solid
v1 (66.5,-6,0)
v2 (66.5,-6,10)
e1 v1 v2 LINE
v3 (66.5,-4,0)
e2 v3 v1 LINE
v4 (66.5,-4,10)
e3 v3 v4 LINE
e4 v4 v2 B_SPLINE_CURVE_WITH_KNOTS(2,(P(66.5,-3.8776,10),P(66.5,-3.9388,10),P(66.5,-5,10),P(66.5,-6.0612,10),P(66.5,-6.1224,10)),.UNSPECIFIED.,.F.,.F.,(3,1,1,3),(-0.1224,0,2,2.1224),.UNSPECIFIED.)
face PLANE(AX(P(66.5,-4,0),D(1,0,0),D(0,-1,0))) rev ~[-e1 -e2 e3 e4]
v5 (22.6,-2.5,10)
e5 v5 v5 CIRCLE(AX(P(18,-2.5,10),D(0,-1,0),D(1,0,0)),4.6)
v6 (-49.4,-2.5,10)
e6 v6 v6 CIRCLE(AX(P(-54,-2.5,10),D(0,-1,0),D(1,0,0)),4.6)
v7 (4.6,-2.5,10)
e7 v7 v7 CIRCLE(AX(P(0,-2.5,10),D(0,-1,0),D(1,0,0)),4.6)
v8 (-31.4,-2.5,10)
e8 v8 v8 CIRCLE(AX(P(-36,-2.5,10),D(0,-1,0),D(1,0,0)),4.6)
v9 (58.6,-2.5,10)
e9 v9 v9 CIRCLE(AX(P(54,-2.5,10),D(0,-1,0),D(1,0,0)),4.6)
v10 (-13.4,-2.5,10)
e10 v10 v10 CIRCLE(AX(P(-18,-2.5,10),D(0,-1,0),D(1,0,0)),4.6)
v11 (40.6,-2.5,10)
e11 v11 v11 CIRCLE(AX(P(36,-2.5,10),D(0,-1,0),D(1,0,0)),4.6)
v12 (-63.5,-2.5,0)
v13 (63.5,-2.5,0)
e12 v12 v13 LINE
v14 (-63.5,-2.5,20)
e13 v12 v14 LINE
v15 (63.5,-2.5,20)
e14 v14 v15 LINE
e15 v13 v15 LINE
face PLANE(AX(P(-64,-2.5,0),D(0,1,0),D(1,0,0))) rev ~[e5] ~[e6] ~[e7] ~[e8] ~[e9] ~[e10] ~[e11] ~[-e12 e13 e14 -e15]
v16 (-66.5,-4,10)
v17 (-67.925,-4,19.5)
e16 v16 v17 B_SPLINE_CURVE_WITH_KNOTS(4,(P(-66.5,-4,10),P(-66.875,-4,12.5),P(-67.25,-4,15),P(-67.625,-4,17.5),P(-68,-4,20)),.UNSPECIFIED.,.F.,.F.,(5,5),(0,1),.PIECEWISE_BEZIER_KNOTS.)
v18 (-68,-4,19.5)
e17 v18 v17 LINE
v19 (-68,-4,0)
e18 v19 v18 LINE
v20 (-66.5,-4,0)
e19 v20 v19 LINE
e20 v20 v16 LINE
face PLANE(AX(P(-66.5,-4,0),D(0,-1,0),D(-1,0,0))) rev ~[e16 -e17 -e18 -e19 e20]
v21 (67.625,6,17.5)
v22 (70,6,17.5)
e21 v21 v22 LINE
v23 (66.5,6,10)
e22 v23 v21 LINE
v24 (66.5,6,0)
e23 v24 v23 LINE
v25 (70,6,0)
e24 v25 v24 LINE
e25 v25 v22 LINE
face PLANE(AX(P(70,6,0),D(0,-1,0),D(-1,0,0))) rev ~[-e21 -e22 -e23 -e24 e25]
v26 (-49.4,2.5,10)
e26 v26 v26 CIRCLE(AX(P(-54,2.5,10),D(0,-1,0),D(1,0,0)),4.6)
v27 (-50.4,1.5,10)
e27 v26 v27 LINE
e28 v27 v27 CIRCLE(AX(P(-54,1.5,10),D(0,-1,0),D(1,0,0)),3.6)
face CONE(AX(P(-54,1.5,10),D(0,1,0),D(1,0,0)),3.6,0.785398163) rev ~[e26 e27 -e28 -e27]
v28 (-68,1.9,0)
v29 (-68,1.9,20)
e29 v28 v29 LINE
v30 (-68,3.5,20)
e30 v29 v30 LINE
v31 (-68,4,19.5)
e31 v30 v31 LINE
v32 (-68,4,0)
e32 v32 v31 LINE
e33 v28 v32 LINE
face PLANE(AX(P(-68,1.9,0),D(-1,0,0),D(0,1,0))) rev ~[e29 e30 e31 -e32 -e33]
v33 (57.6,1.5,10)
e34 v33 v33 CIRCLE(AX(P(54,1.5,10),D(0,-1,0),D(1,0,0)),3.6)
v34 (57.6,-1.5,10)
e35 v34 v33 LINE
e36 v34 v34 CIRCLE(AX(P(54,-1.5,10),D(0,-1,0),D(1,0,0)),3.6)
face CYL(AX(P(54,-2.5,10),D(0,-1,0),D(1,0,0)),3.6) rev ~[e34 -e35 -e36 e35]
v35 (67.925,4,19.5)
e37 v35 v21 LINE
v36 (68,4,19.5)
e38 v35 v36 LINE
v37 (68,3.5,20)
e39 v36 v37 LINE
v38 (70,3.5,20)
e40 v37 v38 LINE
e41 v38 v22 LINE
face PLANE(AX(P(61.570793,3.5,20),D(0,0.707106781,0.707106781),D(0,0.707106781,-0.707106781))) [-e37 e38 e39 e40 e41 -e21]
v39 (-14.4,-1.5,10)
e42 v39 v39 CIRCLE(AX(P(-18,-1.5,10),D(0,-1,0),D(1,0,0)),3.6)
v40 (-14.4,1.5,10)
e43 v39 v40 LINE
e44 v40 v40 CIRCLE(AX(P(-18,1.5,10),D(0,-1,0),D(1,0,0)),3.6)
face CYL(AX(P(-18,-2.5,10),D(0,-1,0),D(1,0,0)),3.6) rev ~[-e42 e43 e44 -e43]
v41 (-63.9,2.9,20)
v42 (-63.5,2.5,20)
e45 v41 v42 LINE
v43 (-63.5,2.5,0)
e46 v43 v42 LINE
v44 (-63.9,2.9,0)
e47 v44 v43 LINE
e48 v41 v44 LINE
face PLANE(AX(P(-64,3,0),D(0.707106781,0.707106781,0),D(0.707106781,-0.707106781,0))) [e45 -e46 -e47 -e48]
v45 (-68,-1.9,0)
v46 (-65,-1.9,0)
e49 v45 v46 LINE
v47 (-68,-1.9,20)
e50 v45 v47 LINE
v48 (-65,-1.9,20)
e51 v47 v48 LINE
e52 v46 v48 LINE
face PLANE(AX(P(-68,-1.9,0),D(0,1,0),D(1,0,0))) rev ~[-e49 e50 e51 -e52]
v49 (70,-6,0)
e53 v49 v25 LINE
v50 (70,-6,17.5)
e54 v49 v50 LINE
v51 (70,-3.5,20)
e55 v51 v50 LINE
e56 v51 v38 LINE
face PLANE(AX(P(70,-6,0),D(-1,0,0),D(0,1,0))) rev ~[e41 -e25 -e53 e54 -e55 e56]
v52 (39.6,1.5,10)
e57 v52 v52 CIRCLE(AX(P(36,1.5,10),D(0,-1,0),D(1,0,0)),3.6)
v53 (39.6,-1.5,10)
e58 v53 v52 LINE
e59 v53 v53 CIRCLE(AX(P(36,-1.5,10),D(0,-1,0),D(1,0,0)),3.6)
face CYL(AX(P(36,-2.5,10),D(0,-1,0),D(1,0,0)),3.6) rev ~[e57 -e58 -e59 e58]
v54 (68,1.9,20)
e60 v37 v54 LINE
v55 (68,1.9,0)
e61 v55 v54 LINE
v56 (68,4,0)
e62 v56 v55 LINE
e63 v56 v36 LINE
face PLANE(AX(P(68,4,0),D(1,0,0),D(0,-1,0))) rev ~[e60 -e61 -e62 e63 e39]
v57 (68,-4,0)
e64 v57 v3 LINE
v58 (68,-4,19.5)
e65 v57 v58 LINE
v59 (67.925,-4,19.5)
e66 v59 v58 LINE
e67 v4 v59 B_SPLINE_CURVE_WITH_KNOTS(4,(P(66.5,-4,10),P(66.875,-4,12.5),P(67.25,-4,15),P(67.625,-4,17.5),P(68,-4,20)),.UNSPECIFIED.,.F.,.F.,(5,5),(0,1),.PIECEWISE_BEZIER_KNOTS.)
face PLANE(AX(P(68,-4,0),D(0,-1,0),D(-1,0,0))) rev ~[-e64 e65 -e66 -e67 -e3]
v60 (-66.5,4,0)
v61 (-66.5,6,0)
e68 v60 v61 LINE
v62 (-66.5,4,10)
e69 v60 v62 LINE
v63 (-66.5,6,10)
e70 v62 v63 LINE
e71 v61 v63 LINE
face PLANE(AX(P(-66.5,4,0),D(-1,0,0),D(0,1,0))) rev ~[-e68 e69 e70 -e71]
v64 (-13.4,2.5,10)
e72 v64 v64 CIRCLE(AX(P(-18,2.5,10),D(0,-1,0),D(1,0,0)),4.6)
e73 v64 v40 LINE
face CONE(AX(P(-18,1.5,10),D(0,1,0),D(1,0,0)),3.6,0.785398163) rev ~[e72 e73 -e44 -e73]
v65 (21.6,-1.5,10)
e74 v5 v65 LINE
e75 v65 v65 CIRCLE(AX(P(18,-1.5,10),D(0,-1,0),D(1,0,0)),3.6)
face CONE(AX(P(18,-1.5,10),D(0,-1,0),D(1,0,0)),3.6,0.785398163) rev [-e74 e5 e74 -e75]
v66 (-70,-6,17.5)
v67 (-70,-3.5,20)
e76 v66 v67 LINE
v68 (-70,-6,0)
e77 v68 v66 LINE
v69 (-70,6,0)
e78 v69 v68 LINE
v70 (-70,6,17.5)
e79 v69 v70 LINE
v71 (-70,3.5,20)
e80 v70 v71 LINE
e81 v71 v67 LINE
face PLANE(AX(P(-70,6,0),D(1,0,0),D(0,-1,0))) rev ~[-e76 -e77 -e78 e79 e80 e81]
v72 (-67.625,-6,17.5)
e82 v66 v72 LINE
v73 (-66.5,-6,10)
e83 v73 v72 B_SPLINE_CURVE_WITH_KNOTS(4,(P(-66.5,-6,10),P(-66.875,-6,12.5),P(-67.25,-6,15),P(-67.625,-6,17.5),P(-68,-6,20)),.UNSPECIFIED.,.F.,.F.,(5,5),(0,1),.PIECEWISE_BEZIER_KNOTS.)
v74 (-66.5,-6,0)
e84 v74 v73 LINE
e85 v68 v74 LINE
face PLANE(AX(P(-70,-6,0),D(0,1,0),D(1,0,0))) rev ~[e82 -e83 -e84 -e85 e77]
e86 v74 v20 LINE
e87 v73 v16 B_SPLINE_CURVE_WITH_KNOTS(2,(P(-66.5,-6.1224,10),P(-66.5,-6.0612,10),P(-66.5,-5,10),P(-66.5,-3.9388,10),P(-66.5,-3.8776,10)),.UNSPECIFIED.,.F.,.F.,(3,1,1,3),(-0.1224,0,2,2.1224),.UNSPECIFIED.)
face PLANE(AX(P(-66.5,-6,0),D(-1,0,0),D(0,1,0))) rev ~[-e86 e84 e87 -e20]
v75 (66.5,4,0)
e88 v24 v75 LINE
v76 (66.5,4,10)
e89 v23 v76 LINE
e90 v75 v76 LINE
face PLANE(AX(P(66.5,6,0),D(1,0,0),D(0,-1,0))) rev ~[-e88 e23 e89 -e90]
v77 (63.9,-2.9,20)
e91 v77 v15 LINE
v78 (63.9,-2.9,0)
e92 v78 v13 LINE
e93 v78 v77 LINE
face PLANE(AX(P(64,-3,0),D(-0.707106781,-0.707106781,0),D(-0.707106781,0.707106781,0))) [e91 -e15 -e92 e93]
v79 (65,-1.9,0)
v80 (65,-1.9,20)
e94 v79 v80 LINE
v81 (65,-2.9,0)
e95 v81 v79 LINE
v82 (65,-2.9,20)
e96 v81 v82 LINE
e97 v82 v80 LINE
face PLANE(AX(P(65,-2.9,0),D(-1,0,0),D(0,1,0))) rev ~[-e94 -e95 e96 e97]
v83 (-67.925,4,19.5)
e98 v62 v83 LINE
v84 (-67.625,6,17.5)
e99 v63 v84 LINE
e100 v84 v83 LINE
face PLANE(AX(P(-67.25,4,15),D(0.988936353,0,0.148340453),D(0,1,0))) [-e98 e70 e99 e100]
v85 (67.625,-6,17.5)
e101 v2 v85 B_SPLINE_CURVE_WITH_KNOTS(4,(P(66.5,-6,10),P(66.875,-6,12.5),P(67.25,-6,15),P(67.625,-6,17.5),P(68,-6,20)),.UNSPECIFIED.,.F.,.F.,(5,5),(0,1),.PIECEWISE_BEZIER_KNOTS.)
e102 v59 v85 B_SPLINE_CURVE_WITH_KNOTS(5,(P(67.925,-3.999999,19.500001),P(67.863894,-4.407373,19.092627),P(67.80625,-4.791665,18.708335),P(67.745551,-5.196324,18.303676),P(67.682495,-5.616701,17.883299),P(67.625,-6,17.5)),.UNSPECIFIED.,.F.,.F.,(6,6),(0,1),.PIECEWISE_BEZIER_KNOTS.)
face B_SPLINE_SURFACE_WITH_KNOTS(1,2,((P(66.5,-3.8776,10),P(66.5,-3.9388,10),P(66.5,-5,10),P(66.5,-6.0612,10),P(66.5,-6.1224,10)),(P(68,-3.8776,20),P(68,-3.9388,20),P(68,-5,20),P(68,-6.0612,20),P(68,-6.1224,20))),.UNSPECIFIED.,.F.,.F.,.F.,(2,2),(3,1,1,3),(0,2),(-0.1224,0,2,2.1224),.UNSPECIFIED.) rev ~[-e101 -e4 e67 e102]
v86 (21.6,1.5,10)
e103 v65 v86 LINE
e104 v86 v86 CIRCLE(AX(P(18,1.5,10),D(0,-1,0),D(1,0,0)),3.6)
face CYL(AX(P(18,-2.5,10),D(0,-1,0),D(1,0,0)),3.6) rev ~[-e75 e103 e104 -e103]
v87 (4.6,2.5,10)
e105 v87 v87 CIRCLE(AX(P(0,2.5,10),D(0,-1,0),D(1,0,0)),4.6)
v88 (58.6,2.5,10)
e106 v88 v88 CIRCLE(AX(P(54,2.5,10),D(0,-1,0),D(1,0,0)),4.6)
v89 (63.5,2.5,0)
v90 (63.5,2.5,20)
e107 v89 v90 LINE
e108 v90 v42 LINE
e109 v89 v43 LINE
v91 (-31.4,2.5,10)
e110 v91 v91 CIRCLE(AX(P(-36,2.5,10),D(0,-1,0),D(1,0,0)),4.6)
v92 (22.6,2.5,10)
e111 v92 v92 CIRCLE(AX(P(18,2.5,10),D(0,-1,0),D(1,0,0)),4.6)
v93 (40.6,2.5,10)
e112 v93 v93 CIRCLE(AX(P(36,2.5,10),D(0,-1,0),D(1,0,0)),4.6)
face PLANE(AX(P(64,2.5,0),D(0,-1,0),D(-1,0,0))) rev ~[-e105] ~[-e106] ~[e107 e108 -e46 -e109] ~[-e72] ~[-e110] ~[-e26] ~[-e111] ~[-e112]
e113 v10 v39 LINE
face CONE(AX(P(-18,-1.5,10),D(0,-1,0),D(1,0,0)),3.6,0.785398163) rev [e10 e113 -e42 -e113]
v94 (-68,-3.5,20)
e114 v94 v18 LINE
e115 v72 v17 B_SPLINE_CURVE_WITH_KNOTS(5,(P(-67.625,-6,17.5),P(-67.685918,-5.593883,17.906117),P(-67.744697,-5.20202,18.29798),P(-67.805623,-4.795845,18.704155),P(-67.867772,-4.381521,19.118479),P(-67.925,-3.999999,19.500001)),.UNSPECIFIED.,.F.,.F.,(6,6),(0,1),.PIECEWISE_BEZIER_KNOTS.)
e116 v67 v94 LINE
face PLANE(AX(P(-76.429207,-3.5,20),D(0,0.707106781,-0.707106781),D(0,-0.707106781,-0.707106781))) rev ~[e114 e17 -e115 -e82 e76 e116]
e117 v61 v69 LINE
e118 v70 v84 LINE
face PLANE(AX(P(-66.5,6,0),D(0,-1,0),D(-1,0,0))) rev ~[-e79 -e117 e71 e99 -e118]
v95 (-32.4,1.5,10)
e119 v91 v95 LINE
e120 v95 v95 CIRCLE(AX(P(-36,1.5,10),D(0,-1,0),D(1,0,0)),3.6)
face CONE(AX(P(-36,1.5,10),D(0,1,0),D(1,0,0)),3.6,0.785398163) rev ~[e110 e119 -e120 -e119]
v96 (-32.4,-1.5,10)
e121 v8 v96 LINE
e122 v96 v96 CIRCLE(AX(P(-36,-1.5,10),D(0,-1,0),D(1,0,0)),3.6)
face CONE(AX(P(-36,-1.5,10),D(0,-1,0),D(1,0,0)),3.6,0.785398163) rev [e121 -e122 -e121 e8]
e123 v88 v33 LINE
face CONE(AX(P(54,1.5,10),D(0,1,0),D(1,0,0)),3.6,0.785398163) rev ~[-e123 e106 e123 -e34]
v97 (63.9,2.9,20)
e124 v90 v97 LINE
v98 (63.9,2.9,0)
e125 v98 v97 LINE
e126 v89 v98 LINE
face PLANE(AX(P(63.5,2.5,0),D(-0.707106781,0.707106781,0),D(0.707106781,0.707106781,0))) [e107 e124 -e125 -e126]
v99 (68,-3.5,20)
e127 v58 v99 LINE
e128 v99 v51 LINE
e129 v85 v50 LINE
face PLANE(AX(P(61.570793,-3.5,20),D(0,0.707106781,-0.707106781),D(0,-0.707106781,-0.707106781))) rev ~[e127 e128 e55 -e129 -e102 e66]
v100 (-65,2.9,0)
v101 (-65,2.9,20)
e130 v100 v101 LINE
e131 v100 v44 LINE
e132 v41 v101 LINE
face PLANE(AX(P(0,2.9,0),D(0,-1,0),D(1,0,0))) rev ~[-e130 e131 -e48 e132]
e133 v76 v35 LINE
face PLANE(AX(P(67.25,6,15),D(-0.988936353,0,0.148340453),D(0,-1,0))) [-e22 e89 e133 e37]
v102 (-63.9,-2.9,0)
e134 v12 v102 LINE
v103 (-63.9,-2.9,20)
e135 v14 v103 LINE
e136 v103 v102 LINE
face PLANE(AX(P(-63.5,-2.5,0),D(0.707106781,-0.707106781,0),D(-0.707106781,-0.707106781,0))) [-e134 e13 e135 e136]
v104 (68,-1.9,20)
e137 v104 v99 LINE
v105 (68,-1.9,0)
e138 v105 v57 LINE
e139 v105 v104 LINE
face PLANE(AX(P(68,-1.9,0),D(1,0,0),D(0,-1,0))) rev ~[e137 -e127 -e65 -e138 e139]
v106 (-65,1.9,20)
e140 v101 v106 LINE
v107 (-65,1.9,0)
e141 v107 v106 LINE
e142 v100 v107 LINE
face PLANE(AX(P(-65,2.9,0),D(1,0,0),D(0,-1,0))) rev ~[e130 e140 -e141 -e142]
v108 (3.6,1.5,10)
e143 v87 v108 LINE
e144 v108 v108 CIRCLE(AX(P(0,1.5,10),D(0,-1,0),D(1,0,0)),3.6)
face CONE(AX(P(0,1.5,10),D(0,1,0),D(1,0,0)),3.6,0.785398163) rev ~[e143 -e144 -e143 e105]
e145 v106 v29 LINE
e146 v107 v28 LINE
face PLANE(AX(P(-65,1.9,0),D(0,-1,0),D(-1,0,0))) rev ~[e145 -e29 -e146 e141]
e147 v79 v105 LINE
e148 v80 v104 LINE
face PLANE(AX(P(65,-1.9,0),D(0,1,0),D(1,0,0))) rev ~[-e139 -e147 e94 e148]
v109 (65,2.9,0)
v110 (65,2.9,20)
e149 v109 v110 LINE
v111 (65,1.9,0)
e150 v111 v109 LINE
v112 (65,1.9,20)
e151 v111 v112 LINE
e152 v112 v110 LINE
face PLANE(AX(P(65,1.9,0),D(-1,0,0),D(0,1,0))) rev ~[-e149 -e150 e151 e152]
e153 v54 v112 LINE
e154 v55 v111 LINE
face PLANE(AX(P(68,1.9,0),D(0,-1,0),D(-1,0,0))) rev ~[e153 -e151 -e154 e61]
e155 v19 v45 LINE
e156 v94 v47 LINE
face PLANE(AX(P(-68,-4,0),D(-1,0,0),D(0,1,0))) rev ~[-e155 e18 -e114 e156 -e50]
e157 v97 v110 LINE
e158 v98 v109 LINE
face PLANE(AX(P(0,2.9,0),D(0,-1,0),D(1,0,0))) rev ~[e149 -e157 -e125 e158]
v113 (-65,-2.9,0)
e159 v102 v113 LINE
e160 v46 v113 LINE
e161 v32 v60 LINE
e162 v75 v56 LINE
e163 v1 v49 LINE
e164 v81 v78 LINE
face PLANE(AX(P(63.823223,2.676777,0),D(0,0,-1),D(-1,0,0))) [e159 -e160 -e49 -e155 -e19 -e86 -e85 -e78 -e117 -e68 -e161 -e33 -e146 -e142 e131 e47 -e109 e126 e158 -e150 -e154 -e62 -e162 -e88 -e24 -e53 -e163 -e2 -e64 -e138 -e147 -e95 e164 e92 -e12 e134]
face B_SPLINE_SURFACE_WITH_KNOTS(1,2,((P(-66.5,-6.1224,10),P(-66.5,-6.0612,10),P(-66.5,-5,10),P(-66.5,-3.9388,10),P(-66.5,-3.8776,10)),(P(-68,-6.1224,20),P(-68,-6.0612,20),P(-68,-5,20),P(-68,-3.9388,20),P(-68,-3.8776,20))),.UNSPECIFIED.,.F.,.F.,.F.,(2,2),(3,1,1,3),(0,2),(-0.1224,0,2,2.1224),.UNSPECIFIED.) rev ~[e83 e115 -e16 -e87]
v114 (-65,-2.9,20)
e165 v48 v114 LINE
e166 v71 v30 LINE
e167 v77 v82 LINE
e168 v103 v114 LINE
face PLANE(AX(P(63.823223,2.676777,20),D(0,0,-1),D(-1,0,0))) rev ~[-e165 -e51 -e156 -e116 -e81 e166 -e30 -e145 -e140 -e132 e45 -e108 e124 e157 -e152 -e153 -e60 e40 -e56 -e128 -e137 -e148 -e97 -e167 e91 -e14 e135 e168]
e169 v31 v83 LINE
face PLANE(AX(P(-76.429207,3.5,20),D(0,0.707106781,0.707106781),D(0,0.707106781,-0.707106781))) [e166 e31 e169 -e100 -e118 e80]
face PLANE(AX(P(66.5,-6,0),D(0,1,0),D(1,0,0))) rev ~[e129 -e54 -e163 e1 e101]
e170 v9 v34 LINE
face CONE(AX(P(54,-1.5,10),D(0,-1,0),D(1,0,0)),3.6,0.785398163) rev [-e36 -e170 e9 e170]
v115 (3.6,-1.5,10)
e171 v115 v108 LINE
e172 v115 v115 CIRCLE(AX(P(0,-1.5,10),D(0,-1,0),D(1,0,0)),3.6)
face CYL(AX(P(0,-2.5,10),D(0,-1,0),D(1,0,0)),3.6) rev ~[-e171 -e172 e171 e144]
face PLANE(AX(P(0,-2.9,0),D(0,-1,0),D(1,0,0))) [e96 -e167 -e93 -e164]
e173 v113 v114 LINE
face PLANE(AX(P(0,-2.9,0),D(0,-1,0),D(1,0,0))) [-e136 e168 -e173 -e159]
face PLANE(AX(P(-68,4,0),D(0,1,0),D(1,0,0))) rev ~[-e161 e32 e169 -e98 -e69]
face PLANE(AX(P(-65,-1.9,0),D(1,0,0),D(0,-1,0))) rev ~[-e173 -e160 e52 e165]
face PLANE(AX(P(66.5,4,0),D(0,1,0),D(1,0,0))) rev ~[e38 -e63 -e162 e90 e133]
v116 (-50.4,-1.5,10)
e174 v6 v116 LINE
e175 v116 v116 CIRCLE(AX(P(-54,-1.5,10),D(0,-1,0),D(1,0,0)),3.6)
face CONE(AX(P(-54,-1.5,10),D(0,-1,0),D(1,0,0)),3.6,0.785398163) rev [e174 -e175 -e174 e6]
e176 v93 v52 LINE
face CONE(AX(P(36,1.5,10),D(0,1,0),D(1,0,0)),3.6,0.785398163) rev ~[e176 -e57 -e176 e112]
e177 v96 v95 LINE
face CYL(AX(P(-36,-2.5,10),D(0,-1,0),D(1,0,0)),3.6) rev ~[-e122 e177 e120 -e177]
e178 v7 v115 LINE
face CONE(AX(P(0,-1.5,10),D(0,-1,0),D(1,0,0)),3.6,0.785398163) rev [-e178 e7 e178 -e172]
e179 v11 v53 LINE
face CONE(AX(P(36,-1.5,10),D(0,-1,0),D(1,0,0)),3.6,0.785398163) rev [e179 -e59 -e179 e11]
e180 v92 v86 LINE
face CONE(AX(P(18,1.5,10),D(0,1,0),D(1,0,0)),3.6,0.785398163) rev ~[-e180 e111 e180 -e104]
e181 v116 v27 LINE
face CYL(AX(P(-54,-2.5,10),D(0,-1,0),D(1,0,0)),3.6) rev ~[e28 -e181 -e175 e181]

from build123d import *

# Parameters (mm, degrees)
F1_DEPTH     = 20
F2_T4_DEPTH  = 20
F2_T9_DEPTH  = 20
F2_T14_DEPTH = 20
F2_T19_DEPTH = 20
F3_SIZE2     = 1.5
F3_SIZE      = 10
F3_2_SIZE2   = 1.5
F3_2_SIZE    = 10
F3_3_SIZE2   = 1.5
F3_3_SIZE    = 10
F3_4_SIZE2   = 1.5
F3_4_SIZE    = 10
F4_T1_DEPTH  = 14.8584149398
F4_T3_DEPTH  = 14.8584149398
F5_R         = 3.6
F6_DEPTH     = 25
F7_SIZE      = 1


# Not quite as in the source:
# - a fillet or chamfer that OpenCascade refuses, or shapes differently, is made with other operations: its cross-section is extruded or revolved along the edge and cut away or added


with BuildPart() as f1:
    # F0 (on Top) → F1 (new body)
    with BuildSketch(Plane.XY):
        Polygon((-70, 6), (-70, 0), (-70, -6), (-66.5, -6), (-66.5, -4), (-68, -4), (-68, -1.9), (-65, -1.9), (-65, -2.9), (-64, -2.9), (-64, -2.5), (0, -2.5), (64, -2.5), (64, -2.9), (65, -2.9), (65, -1.9), (68, -1.9), (68, -4), (66.5, -4), (66.5, -6), (70, -6), (70, 0), (70, 6), (66.5, 6), (66.5, 4), (68, 4), (68, 1.9), (65, 1.9), (65, 2.9), (64, 2.9), (64, 2.5), (0, 2.5), (-64, 2.5), (-64, 2.9), (-65, 2.9), (-65, 1.9), (-68, 1.9), (-68, 4), (-66.5, 4), (-66.5, 6), align=None)
    extrude(amount=F1_DEPTH)

    # F2: chamfer of 0.5 on 4 edges, made by hand


with BuildPart() as f2_tool2:
    # F2_s3 → F2_t4 (new body)
    with BuildSketch(Plane.XY):
        Polygon((-64, 3), (-63.5, 2.5), (-64, 2.5), align=None)
    extrude(amount=F2_T4_DEPTH)

    split(bisect_by=Plane.XZ.offset(-2.9), keep=Keep.TOP)


with BuildPart() as f1_1:
    add(f1.part)

    # F2_t1: union F2_tool2
    add(f2_tool2.part)


with BuildPart() as f2_tool7:
    # F2_s8 → F2_t9 (new body)
    with BuildSketch(Plane.XY):
        Polygon((-63.5, -2.5), (-64, -3), (-64, -2.5), align=None)
    extrude(amount=F2_T9_DEPTH)

    split(bisect_by=Plane.XZ.offset(2.9), keep=Keep.BOTTOM)


with BuildPart() as f1_2:
    add(f1_1.part)

    # F2_t6: union F2_tool7
    add(f2_tool7.part)


with BuildPart() as f2_tool12:
    # F2_s13 → F2_t14 (new body)
    with BuildSketch(Plane.XY):
        Polygon((64, -3), (63.5, -2.5), (64, -2.5), align=None)
    extrude(amount=F2_T14_DEPTH)

    split(bisect_by=Plane.XZ.offset(2.9), keep=Keep.BOTTOM)


with BuildPart() as f1_3:
    add(f1_2.part)

    # F2_t11: union F2_tool12
    add(f2_tool12.part)


with BuildPart() as f2_tool17:
    # F2_s18 → F2_t19 (new body)
    with BuildSketch(Plane.XY):
        Polygon((63.5, 2.5), (64, 3), (64, 2.5), align=None)
    extrude(amount=F2_T19_DEPTH)

    split(bisect_by=Plane.XZ.offset(-2.9), keep=Keep.TOP)


with BuildPart() as f1_4:
    add(f1_3.part)

    # F2_t16: union F2_tool17
    add(f2_tool17.part)

    # F3
    f3_edges = [f1_4.edges().sort_by_distance(p)[0] for p in [
        (-66.5, 5, 20),
    ]]
    f3_side = f1_4.faces().sort_by_distance((-66.5, 5, 10))[0]
    chamfer(f3_edges, length=F3_SIZE, length2=F3_SIZE2, reference=f3_side)

    # F3#2
    f3_2_edges = [f1_4.edges().sort_by_distance(p)[0] for p in [
        (-66.5, -5, 20),
    ]]
    f3_2_side = f1_4.faces().sort_by_distance((-66.5, -5, 10))[0]
    chamfer(f3_2_edges, length=F3_2_SIZE, length2=F3_2_SIZE2, reference=f3_2_side)

    # F3#3
    f3_3_edges = [f1_4.edges().sort_by_distance(p)[0] for p in [
        (66.5, 5, 20),
    ]]
    f3_3_side = f1_4.faces().sort_by_distance((66.5, 5, 10))[0]
    chamfer(f3_3_edges, length=F3_3_SIZE, length2=F3_3_SIZE2, reference=f3_3_side)

    # F3#4
    f3_4_edges = [f1_4.edges().sort_by_distance(p)[0] for p in [
        (66.5, -5, 20),
    ]]
    f3_4_side = f1_4.faces().sort_by_distance((66.5, -5, 10))[0]
    chamfer(f3_4_edges, length=F3_4_SIZE, length2=F3_4_SIZE2, reference=f3_4_side)

    # F4: chamfer of 2.5 on 4 edges, made by hand

    # F4_s2 → F4_t1 (cut)
    with BuildSketch(Plane.YZ.offset(-76.4292074699)):
        Polygon((3.5, 20), (6, 17.5), (6, 20), align=None)
        Polygon((-3.5, 20), (-6, 17.5), (-6, 20), align=None)
    extrude(amount=F4_T1_DEPTH, mode=Mode.SUBTRACT)

    # F4_s4 → F4_t3 (cut)
    with BuildSketch(Plane.YZ.offset(61.5707925301)):
        Polygon((3.5, 20), (6, 17.5), (6, 20), align=None)
        Polygon((-3.5, 20), (-6, 17.5), (-6, 20), align=None)
    extrude(amount=F4_T3_DEPTH, mode=Mode.SUBTRACT)

    # F5 (on face) → F6 (cut)
    with BuildSketch(Plane.XZ.offset(2.5)):
        with Locations((-54, 10)):
            Circle(F5_R)
        with Locations((-36, 10)):
            Circle(F5_R)
        with Locations((-18, 10)):
            Circle(F5_R)
        with Locations((0, 10)):
            Circle(F5_R)
        with Locations((18, 10)):
            Circle(F5_R)
        with Locations((36, 10)):
            Circle(F5_R)
        with Locations((54, 10)):
            Circle(F5_R)
    extrude(amount=-F6_DEPTH, mode=Mode.SUBTRACT)

    # F7
    f7_edges = [f1_4.edges().sort_by_distance(p)[0] for p in [
        (-57.6, -2.5, 10),
        (-50.4, 0, 10),
        (-57.6, 2.5, 10),
        (-39.6, -2.5, 10),
        (-32.4, 0, 10),
        (-39.6, 2.5, 10),
        (-21.6, -2.5, 10),
        (-14.4, 0, 10),
        (-21.6, 2.5, 10),
        (-3.6, -2.5, 10),
        (3.6, 0, 10),
        (-3.6, 2.5, 10),
        (14.4, -2.5, 10),
        (21.6, 0, 10),
        (14.4, 2.5, 10),
        (32.4, -2.5, 10),
        (39.6, 0, 10),
        (32.4, 2.5, 10),
        (50.4, -2.5, 10),
        (57.6, 0, 10),
        (50.4, 2.5, 10),
    ]]
    chamfer(f7_edges, length=F7_SIZE)


solid = f1_4.part
